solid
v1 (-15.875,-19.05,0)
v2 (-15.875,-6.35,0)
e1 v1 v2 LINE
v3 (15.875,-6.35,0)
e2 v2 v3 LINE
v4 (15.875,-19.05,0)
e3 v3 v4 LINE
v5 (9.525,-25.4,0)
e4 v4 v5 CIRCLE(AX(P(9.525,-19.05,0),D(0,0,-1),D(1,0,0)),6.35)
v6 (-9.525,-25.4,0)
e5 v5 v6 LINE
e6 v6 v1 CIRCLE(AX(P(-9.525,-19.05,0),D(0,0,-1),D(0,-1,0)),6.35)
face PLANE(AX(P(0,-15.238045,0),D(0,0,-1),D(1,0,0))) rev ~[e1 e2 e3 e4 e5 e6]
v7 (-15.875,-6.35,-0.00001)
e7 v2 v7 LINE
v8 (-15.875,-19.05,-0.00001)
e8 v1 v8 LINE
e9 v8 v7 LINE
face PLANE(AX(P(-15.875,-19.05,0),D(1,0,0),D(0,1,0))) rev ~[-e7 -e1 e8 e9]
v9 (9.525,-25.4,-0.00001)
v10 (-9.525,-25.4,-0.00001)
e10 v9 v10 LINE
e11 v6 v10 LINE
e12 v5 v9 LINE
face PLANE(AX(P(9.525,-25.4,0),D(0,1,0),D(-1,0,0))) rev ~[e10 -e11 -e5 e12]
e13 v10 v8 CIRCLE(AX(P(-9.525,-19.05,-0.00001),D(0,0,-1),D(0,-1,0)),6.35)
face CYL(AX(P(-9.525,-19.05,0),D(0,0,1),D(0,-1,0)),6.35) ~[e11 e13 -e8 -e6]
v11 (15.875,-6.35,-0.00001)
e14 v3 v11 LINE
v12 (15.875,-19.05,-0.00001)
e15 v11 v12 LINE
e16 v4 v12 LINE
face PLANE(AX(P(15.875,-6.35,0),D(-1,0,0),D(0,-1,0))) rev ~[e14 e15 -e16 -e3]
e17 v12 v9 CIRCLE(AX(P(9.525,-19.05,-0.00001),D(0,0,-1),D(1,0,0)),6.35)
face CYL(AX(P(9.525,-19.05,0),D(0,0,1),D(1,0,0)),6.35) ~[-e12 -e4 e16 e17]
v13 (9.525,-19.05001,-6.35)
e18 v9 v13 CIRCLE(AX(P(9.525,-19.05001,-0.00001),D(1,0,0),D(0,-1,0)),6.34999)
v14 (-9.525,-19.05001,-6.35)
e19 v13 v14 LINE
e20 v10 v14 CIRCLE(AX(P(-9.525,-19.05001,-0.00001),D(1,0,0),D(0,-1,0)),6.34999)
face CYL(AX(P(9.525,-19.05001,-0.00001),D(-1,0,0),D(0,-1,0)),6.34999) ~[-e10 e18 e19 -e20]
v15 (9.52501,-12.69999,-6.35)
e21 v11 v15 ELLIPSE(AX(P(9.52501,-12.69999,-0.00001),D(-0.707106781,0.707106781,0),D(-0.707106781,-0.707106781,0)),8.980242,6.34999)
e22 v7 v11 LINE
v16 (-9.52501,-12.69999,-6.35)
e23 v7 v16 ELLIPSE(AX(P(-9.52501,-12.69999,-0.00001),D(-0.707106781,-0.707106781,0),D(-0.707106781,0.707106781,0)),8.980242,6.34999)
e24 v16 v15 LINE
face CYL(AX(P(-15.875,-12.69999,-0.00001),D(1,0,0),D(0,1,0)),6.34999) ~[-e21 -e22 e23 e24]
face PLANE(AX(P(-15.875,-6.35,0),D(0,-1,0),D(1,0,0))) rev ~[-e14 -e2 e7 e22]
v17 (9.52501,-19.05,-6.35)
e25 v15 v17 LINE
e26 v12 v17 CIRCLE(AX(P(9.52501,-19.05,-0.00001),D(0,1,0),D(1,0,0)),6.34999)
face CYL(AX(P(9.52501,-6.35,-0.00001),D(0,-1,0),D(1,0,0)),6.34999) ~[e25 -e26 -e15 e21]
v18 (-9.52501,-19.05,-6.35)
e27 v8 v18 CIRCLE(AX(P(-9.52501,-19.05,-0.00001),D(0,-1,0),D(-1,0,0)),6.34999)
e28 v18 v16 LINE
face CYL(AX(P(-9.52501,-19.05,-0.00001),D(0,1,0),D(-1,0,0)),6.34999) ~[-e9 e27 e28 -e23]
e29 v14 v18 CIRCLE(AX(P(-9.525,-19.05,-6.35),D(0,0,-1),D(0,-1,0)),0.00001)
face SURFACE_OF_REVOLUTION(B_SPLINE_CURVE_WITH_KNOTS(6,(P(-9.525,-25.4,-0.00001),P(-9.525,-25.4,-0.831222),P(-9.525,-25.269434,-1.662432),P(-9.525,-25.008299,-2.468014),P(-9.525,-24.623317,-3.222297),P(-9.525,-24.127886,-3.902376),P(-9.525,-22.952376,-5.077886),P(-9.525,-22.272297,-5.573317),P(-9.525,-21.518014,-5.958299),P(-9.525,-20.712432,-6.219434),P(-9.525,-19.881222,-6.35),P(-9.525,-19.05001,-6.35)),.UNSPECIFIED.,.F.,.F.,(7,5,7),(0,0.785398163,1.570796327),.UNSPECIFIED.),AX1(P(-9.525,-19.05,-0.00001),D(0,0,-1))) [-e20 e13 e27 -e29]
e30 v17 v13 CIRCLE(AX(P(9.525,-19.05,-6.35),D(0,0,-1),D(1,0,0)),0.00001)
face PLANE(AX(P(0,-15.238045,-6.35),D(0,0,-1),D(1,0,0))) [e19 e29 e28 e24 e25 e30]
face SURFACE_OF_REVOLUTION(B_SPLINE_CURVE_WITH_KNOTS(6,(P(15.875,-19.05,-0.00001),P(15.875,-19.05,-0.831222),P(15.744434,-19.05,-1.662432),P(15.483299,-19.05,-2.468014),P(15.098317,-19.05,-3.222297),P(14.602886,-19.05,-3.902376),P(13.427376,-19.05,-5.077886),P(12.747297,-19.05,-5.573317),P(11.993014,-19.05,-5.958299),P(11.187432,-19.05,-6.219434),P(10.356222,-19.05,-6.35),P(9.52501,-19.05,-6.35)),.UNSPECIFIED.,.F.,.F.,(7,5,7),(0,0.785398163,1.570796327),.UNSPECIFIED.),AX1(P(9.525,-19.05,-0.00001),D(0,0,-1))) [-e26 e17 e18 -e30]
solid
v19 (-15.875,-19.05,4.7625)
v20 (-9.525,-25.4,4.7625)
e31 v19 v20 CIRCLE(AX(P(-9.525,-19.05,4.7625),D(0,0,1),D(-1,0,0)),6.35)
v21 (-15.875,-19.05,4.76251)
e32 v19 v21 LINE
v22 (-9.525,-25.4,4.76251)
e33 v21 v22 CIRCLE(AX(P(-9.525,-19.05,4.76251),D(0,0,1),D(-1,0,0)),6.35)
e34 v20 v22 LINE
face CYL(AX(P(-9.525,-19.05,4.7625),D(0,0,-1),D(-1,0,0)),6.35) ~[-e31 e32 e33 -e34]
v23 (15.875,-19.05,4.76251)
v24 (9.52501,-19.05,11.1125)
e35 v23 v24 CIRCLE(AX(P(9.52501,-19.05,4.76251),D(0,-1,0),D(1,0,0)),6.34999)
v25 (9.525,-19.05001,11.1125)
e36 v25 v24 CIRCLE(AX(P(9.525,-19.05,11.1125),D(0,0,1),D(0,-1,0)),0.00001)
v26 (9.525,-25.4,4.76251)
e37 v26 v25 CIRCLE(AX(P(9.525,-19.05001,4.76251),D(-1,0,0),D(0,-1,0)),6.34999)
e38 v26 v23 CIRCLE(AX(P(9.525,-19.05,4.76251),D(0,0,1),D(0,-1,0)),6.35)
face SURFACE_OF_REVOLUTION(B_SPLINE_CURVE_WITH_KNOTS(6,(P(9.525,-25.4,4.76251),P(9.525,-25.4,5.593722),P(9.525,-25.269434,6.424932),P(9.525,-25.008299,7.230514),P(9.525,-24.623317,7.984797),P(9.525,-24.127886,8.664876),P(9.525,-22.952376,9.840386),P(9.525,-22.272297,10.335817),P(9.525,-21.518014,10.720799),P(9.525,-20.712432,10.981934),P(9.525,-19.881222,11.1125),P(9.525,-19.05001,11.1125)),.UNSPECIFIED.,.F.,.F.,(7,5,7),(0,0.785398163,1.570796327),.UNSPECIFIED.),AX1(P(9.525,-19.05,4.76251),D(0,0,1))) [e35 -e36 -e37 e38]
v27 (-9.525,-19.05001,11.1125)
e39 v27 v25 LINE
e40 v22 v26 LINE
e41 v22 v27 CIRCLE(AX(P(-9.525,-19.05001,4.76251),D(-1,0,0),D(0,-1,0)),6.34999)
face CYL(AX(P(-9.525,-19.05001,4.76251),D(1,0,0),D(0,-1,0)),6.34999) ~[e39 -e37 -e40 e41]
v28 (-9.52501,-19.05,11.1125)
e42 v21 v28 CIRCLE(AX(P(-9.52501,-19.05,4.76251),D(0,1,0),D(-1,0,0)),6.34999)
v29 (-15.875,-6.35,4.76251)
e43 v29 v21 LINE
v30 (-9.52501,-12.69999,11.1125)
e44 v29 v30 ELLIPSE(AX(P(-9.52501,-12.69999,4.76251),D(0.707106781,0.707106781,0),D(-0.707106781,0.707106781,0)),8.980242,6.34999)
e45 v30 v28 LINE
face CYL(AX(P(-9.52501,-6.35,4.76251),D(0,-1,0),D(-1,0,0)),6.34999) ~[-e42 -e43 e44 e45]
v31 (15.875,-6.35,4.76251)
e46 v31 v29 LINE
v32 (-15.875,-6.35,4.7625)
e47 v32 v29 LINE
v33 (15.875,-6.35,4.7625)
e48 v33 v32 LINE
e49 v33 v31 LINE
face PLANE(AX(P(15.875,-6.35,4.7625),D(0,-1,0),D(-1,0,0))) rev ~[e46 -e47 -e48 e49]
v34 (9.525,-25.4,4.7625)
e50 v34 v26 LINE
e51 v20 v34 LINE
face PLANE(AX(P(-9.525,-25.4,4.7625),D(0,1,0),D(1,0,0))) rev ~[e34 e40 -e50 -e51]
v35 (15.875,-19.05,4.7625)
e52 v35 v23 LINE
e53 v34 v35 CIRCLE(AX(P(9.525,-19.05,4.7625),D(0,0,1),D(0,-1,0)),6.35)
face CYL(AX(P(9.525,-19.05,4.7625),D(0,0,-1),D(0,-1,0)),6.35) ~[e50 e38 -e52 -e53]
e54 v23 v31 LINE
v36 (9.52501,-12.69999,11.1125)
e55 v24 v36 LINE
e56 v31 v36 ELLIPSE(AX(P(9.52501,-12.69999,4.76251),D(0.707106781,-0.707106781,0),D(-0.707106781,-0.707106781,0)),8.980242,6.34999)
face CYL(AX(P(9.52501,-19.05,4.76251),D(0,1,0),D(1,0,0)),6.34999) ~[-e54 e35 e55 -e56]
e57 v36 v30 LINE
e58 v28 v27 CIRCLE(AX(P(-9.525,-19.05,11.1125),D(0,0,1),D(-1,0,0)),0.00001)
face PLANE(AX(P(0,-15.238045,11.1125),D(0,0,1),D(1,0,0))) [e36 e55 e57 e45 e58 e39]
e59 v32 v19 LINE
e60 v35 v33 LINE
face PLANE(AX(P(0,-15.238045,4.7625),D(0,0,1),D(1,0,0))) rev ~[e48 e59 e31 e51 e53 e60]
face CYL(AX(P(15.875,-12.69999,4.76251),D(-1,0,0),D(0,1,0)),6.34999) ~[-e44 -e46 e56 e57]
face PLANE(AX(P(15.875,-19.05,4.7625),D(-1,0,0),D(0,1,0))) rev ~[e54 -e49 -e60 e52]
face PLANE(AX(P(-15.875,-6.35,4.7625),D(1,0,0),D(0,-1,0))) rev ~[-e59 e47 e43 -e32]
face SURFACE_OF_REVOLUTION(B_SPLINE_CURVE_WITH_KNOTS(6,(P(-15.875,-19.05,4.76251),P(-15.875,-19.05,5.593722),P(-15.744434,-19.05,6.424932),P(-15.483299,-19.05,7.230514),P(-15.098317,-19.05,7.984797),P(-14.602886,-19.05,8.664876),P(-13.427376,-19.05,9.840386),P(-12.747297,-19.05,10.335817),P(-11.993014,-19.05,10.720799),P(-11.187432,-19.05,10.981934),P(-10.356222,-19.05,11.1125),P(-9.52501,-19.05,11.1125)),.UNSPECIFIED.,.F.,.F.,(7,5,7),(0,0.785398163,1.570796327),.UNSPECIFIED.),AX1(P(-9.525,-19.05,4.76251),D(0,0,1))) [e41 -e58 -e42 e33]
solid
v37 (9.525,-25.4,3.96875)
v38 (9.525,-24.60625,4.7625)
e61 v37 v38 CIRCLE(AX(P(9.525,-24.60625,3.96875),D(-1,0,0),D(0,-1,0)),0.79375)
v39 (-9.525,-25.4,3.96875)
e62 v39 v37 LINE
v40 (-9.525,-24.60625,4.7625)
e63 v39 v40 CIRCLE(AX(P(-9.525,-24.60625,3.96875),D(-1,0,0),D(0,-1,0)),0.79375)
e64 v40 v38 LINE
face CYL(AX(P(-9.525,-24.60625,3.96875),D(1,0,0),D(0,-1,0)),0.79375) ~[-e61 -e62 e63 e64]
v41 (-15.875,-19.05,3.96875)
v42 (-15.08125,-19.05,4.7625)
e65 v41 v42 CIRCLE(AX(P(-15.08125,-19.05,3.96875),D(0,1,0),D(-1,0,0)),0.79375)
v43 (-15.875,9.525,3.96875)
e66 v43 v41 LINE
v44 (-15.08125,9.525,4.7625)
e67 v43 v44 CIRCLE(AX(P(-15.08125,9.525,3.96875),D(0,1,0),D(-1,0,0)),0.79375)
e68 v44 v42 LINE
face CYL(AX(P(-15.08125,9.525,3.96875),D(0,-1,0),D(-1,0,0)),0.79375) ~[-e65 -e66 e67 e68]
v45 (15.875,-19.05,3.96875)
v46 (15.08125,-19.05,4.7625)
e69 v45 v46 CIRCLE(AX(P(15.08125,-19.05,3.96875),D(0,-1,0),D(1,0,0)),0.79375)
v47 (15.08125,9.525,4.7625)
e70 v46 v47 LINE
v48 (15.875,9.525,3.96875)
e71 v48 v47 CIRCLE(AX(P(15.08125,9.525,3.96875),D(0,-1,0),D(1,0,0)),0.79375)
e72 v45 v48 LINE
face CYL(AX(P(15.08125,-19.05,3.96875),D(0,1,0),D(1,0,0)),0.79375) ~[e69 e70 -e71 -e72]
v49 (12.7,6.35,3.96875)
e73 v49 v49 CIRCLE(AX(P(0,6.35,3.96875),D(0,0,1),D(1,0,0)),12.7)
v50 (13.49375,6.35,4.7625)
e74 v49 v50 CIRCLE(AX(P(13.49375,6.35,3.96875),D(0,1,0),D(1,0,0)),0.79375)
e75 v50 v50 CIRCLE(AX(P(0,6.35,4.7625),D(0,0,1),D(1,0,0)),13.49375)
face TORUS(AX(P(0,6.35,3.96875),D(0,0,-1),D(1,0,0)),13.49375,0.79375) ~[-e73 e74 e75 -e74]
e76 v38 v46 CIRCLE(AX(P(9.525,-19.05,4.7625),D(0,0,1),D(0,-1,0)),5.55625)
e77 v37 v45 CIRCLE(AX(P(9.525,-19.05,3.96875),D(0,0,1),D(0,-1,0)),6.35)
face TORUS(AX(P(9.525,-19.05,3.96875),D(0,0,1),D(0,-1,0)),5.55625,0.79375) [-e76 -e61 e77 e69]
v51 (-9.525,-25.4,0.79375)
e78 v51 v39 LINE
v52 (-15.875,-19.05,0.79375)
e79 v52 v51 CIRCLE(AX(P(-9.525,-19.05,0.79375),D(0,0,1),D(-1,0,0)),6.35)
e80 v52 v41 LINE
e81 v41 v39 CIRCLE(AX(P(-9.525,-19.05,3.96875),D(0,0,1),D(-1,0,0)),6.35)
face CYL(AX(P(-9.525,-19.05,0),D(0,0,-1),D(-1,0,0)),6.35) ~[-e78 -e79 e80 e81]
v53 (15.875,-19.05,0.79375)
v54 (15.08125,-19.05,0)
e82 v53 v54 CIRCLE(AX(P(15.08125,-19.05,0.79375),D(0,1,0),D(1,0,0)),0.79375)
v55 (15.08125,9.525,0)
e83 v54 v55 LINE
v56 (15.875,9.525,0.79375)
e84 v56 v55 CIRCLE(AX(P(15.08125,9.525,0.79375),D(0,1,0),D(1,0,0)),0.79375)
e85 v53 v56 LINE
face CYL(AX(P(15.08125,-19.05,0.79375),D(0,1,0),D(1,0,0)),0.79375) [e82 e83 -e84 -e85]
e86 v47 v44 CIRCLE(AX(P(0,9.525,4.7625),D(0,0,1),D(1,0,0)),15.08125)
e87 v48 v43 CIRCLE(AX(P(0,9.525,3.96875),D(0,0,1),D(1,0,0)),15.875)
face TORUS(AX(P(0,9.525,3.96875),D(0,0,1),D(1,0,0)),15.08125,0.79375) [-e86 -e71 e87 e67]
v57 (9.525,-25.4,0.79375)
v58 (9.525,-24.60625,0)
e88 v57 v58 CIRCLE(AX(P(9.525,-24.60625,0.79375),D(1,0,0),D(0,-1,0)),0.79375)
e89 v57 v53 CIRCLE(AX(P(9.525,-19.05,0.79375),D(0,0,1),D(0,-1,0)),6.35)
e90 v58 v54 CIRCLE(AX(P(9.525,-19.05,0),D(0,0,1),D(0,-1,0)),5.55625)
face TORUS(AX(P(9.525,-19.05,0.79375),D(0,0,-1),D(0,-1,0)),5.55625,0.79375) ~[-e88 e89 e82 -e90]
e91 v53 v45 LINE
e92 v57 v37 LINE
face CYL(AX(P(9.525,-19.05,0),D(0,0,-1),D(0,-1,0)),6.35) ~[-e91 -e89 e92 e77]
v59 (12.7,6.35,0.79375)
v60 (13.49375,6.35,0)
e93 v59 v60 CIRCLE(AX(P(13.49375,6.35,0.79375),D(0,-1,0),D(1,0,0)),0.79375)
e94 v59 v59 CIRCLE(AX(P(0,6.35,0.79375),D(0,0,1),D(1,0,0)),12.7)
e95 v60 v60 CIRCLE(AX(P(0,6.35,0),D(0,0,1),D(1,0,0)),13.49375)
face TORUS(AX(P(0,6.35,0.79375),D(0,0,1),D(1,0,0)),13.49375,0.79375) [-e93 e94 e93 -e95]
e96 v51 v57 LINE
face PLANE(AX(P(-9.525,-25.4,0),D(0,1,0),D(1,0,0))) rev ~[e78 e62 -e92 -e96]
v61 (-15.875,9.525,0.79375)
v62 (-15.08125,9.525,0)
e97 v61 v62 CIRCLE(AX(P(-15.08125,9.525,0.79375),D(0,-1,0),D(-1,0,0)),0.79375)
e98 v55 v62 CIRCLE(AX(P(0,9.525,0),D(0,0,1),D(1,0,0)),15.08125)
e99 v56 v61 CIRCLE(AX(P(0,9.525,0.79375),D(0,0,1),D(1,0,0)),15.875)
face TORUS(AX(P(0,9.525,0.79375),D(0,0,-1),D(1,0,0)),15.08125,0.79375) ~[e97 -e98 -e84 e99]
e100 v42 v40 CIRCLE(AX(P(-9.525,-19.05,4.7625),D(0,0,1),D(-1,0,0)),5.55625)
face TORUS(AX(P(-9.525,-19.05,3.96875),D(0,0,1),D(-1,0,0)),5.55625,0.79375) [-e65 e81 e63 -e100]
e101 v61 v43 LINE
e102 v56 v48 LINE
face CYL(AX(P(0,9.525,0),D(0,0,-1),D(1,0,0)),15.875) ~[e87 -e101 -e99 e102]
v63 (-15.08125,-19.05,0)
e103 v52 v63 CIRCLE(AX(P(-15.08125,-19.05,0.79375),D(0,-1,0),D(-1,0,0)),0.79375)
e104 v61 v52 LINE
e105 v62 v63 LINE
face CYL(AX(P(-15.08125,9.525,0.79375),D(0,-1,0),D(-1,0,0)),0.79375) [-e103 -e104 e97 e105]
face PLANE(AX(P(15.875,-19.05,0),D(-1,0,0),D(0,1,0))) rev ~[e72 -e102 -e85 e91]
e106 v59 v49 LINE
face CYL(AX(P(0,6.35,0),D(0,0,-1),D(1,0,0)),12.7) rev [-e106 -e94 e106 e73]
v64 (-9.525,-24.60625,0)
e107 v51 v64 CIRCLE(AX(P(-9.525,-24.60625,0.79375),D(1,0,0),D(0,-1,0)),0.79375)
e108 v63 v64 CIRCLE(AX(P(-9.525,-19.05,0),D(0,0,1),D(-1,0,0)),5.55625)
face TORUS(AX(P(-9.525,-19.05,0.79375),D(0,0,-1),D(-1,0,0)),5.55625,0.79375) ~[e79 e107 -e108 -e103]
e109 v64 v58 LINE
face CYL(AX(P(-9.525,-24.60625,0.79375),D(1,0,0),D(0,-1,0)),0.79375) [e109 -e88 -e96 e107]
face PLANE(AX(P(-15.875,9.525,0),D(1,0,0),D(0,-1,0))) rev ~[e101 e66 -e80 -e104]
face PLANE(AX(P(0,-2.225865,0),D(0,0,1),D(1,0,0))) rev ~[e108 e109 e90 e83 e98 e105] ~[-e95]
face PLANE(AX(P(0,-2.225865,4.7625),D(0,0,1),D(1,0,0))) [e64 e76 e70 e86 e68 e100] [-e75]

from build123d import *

# Parameters (mm, degrees)
F0_R     = 12.7
F1_DEPTH = 4.7625
F3_DEPTH = 6.35
F5_DEPTH = 6.35
F6_R     = 6.34999
F6_2_R   = 6.34999
F7_R     = 0.79375


# Not quite as in the source:
# - a fillet or chamfer is up to 0.001 mm smaller than in the source, because OpenCascade refuses the exact size


with BuildPart() as f1:
    # F0 (on Top) → F1 (new body)
    with BuildSketch(Plane.XY):
        with BuildLine():
            Line((-9.525, -25.4), (9.525, -25.4))
            ThreePointArc((9.525, -25.4), (14.0151280605, -23.5401280605), (15.875, -19.05))
            Line((15.875, -19.05), (15.875, 9.525))
            ThreePointArc((15.875, 9.525), (0, 25.4), (-15.875, 9.525))
            Line((-15.875, 9.525), (-15.875, -19.05))
            ThreePointArc((-15.875, -19.05), (-14.0151280605, -23.5401280605), (-9.525, -25.4))
        make_face()
        with Locations((0, 6.35)):
            Circle(F0_R, mode=Mode.SUBTRACT)
    extrude(amount=F1_DEPTH)

    # F7
    f7_edges = [f1.edges().sort_by_distance(p)[0] for p in [
        (-15.875, -4.7625, 4.7625),
        (-14.015128, -23.540128, 4.7625),
        (0, -25.4, 4.7625),
        (14.015128, -23.540128, 4.7625),
        (15.875, -4.7625, 4.7625),
        (0, 25.4, 4.7625),
        (-12.7, 6.35, 4.7625),
        (-15.875, -4.7625, 0),
        (-14.015128, -23.540128, 0),
        (0, -25.4, 0),
        (14.015128, -23.540128, 0),
        (15.875, -4.7625, 0),
        (0, 25.4, 0),
        (-12.7, 6.35, 0),
    ]]
    fillet(f7_edges, radius=F7_R)


with BuildPart() as f3:
    # F2 (on face) → F3 (new body)
    with BuildSketch(Plane.XY.offset(4.7625)):
        with BuildLine():
            Line((15.875, -6.35), (0, -6.35))
            Line((0, -6.35), (-15.875, -6.35))
            Line((-15.875, -6.35), (-15.875, -19.05))
            ThreePointArc((-15.875, -19.05), (-14.0151280605, -23.5401280605), (-9.525, -25.4))
            Line((-9.525, -25.4), (9.525, -25.4))
            ThreePointArc((9.525, -25.4), (14.0151280605, -23.5401280605), (15.875, -19.05))
            Line((15.875, -19.05), (15.875, -6.35))
        make_face()
    extrude(amount=F3_DEPTH)

    # F6#2 (radius 6.35 in the source; OpenCascade refuses exactly that, so slightly less here)
    f6_2_edges = [f3.edges().sort_by_distance(p)[0] for p in [
        (0, -6.35, 11.1125),
        (-15.875, -12.7, 11.1125),
        (-14.015128, -23.540128, 11.1125),
        (0, -25.4, 11.1125),
        (14.015128, -23.540128, 11.1125),
        (15.875, -12.7, 11.1125),
    ]]
    fillet(f6_2_edges, radius=F6_2_R)


with BuildPart() as f5:
    # F4 (on face) → F5 (new body)
    with BuildSketch(Plane(origin=(0, 0, 0), x_dir=(1, 0, 0), z_dir=(0, 0, -1))):
        with BuildLine():
            Line((-15.875, 6.35), (0, 6.35))
            Line((0, 6.35), (15.875, 6.35))
            Line((15.875, 6.35), (15.875, 19.05))
            ThreePointArc((15.875, 19.05), (14.0151280605, 23.5401280605), (9.525, 25.4))
            Line((9.525, 25.4), (-9.525, 25.4))
            ThreePointArc((-9.525, 25.4), (-14.0151280605, 23.5401280605), (-15.875, 19.05))
            Line((-15.875, 19.05), (-15.875, 6.35))
        make_face()
    extrude(amount=F5_DEPTH)

    # F6 (radius 6.35 in the source; OpenCascade refuses exactly that, so slightly less here)
    f6_edges = [f5.edges().sort_by_distance(p)[0] for p in [
        (-15.875, -12.7, -6.35),
        (0, -6.35, -6.35),
        (15.875, -12.7, -6.35),
        (14.015128, -23.540128, -6.35),
        (0, -25.4, -6.35),
        (-14.015128, -23.540128, -6.35),
    ]]
    fillet(f6_edges, radius=F6_R)


solid = Compound([f1.part, f3.part, f5.part])
